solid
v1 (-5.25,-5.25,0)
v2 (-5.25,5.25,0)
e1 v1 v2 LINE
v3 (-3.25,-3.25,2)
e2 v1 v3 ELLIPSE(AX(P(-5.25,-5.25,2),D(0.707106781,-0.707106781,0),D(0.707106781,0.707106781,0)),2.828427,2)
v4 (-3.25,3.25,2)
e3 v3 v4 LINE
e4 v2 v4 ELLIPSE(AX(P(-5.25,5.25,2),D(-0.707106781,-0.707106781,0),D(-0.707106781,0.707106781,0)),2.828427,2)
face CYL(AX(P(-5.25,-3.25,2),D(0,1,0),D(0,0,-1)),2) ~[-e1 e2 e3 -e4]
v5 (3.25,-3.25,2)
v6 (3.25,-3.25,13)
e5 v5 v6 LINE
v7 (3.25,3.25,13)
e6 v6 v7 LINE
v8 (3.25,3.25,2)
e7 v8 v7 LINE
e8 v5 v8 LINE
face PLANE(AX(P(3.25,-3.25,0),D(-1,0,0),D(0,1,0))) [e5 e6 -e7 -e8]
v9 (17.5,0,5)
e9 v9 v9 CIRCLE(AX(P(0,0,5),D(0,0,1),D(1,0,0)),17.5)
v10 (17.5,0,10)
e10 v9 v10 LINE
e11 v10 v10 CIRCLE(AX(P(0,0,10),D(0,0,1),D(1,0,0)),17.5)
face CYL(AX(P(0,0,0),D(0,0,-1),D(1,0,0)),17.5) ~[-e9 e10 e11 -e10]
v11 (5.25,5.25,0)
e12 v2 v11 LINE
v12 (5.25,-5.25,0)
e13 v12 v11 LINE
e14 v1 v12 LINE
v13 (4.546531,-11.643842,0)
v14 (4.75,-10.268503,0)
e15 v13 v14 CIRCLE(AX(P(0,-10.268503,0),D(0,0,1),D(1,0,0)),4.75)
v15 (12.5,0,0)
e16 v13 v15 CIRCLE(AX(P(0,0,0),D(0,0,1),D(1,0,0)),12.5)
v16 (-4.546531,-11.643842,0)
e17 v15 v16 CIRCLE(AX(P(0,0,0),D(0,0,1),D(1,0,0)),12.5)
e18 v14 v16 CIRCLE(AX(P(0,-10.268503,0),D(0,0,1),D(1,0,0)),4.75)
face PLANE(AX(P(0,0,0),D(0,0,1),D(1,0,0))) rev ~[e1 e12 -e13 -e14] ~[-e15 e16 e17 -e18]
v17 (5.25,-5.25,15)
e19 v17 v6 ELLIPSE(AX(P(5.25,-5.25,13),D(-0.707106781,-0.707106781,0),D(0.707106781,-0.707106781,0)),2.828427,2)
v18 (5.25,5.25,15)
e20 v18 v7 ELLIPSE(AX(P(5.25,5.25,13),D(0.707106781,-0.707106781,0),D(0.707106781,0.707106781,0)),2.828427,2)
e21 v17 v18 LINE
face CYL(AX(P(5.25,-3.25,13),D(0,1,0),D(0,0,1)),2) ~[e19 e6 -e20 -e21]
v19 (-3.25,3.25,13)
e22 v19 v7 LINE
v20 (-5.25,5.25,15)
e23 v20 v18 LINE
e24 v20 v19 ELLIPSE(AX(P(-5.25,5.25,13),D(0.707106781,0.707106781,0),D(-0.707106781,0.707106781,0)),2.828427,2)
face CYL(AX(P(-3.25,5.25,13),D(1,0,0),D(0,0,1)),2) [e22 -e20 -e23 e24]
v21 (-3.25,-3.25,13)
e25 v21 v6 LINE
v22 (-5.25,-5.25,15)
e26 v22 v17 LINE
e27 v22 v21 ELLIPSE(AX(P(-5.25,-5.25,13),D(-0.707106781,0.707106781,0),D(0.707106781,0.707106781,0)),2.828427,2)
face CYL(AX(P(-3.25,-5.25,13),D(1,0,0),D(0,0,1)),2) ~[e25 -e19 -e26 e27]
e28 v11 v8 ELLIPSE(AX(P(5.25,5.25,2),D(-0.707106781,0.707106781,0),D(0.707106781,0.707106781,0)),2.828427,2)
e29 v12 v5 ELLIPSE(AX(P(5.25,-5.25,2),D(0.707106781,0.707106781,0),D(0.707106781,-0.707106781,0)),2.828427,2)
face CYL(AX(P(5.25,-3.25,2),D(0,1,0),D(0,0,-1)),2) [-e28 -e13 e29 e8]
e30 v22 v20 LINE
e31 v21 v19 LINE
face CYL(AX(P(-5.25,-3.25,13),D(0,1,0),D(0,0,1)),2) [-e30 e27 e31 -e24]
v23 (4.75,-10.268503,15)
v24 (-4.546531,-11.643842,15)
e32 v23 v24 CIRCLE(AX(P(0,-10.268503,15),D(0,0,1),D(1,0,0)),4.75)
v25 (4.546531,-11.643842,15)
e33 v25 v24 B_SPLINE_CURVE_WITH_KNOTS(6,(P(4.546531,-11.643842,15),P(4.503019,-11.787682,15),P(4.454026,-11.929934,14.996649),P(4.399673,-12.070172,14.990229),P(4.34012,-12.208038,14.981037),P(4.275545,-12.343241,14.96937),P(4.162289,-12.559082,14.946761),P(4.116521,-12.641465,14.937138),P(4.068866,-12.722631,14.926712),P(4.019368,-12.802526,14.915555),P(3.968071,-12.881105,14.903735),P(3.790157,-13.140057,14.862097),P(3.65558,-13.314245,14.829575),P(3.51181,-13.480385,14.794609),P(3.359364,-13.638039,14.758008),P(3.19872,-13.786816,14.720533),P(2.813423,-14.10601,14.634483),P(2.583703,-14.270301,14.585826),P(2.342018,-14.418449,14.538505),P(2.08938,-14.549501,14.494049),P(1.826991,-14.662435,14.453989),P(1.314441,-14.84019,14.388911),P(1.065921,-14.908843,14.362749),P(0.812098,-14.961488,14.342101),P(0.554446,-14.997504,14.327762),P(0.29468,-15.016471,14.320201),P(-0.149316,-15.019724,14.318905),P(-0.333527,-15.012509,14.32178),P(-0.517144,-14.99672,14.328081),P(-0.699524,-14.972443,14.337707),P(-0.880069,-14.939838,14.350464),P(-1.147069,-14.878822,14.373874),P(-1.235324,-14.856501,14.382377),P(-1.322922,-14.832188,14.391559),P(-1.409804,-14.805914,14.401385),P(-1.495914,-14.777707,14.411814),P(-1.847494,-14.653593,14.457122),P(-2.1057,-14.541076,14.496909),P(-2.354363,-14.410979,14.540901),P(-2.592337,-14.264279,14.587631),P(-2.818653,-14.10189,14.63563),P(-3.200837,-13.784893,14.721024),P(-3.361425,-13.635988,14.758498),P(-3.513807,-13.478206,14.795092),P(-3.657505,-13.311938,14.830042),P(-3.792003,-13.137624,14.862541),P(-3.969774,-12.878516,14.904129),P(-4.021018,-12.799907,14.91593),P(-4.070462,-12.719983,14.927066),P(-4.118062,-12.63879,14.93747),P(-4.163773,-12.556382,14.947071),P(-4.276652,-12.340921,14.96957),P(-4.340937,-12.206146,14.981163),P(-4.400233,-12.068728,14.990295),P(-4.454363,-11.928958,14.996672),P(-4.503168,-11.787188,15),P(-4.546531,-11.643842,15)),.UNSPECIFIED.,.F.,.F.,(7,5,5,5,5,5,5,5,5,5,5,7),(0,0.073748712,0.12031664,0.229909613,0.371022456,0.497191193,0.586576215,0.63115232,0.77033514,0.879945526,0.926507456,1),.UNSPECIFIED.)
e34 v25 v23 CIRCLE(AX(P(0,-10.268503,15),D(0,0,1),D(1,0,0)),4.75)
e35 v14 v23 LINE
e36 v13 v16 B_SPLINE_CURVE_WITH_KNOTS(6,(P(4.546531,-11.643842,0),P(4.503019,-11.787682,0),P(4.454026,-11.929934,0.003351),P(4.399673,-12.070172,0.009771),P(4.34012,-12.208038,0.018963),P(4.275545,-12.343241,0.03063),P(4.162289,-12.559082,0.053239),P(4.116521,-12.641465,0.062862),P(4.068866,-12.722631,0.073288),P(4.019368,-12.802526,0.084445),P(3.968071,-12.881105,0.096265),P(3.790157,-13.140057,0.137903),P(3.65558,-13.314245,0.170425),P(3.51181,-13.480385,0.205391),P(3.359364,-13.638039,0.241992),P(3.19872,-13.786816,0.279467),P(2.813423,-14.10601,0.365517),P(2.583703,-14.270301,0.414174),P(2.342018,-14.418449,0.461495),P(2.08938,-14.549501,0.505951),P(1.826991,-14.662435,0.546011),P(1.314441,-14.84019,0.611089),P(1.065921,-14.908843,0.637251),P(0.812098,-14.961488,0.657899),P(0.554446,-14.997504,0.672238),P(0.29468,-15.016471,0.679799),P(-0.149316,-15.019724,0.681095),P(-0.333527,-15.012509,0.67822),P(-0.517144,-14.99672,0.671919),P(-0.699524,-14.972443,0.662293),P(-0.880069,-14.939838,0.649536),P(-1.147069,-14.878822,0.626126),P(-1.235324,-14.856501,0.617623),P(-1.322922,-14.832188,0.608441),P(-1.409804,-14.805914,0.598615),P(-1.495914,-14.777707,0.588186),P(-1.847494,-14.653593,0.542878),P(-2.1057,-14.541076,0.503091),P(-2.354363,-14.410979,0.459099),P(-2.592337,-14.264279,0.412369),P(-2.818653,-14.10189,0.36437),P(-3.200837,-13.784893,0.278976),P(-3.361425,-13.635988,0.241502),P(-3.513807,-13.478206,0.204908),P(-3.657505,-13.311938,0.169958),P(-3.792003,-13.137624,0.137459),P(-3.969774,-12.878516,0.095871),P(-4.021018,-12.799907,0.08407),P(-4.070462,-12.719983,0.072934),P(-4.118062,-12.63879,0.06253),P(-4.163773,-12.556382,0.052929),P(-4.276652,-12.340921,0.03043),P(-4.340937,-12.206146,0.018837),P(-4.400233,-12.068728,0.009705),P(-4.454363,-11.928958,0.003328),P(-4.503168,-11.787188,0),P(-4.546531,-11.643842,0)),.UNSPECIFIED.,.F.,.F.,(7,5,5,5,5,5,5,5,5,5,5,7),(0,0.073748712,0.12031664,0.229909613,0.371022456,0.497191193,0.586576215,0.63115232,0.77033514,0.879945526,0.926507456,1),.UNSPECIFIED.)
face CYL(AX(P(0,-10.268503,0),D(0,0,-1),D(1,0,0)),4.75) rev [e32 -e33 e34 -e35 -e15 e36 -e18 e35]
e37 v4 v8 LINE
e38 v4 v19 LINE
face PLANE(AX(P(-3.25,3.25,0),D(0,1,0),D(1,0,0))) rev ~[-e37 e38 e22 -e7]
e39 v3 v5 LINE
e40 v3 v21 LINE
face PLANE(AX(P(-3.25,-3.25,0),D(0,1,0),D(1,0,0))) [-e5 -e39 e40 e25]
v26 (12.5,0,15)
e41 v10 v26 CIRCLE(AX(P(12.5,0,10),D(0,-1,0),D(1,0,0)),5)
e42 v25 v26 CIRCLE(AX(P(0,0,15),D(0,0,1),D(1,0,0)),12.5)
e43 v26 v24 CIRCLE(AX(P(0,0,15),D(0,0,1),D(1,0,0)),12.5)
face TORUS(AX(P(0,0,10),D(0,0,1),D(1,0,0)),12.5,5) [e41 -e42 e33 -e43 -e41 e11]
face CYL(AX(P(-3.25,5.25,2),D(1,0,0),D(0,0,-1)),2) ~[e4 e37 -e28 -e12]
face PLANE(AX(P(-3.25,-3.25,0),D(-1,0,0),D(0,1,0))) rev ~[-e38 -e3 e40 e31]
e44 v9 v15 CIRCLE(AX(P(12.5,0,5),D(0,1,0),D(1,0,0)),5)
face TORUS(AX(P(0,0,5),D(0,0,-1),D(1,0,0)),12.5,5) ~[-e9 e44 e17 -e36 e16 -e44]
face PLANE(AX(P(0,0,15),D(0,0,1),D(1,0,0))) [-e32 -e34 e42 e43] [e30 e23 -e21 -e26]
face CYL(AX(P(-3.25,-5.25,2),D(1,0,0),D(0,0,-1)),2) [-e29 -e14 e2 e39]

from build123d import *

# Parameters (mm, degrees)
F0_R     = 17.5
F0_R_2   = 4.75
F0_W     = 6.5
F0_H     = 6.5
F1_DEPTH = 15
F3_R     = 2


# Not quite as in the source:
# - a fillet or chamfer that OpenCascade refuses, or shapes differently, is made with other operations: its cross-section is extruded or revolved along the edge and cut away or added
# - a feature names something its author has since deleted; it is built from what else it names


with BuildPart() as f1:
    # F0 (on Top) → F1 (new body)
    with BuildSketch(Plane.XY):
        Circle(F0_R)
        with Locations((0, -10.2685028687)):
            Circle(F0_R_2, mode=Mode.SUBTRACT)
        Rectangle(F0_W, F0_H, mode=Mode.SUBTRACT)
    extrude(amount=F1_DEPTH)

    # F2: fillet of radius 5 on 2 edges, made by hand

    # F2_s1 → F2_t2 (revolve, cut)
    with BuildSketch(Plane.XZ):
        with BuildLine():
            ThreePointArc((17.5, 10), (16.0355339059, 13.5355339059), (12.5, 15))
            Line((12.5, 15), (17.5, 15))
            Line((17.5, 15), (17.5, 10))
        make_face()
    revolve(axis=Axis((0, 0, 15), (0, 0, 1)), mode=Mode.SUBTRACT)

    # F2_s3 → F2_t4 (revolve, cut)
    with BuildSketch(Plane.XZ):
        with BuildLine():
            ThreePointArc((17.5, 5), (16.0355339059, 1.4644660941), (12.5, 0))
            Line((12.5, 0), (17.5, 0))
            Line((17.5, 0), (17.5, 5))
        make_face()
    revolve(axis=Axis((0, 0, 0), (0, 0, 1)), mode=Mode.SUBTRACT)

    # F3
    f3_edges = [f1.edges().sort_by_distance(p)[0] for p in [
        (-3.25, 0, 15),
        (0, -3.25, 15),
        (0, 3.25, 15),
        (3.25, 0, 15),
        (-3.25, 0, 0),
        (0, -3.25, 0),
        (3.25, 0, 0),
        (0, 3.25, 0),
    ]]
    fillet(f3_edges, radius=F3_R)


solid = f1.part
